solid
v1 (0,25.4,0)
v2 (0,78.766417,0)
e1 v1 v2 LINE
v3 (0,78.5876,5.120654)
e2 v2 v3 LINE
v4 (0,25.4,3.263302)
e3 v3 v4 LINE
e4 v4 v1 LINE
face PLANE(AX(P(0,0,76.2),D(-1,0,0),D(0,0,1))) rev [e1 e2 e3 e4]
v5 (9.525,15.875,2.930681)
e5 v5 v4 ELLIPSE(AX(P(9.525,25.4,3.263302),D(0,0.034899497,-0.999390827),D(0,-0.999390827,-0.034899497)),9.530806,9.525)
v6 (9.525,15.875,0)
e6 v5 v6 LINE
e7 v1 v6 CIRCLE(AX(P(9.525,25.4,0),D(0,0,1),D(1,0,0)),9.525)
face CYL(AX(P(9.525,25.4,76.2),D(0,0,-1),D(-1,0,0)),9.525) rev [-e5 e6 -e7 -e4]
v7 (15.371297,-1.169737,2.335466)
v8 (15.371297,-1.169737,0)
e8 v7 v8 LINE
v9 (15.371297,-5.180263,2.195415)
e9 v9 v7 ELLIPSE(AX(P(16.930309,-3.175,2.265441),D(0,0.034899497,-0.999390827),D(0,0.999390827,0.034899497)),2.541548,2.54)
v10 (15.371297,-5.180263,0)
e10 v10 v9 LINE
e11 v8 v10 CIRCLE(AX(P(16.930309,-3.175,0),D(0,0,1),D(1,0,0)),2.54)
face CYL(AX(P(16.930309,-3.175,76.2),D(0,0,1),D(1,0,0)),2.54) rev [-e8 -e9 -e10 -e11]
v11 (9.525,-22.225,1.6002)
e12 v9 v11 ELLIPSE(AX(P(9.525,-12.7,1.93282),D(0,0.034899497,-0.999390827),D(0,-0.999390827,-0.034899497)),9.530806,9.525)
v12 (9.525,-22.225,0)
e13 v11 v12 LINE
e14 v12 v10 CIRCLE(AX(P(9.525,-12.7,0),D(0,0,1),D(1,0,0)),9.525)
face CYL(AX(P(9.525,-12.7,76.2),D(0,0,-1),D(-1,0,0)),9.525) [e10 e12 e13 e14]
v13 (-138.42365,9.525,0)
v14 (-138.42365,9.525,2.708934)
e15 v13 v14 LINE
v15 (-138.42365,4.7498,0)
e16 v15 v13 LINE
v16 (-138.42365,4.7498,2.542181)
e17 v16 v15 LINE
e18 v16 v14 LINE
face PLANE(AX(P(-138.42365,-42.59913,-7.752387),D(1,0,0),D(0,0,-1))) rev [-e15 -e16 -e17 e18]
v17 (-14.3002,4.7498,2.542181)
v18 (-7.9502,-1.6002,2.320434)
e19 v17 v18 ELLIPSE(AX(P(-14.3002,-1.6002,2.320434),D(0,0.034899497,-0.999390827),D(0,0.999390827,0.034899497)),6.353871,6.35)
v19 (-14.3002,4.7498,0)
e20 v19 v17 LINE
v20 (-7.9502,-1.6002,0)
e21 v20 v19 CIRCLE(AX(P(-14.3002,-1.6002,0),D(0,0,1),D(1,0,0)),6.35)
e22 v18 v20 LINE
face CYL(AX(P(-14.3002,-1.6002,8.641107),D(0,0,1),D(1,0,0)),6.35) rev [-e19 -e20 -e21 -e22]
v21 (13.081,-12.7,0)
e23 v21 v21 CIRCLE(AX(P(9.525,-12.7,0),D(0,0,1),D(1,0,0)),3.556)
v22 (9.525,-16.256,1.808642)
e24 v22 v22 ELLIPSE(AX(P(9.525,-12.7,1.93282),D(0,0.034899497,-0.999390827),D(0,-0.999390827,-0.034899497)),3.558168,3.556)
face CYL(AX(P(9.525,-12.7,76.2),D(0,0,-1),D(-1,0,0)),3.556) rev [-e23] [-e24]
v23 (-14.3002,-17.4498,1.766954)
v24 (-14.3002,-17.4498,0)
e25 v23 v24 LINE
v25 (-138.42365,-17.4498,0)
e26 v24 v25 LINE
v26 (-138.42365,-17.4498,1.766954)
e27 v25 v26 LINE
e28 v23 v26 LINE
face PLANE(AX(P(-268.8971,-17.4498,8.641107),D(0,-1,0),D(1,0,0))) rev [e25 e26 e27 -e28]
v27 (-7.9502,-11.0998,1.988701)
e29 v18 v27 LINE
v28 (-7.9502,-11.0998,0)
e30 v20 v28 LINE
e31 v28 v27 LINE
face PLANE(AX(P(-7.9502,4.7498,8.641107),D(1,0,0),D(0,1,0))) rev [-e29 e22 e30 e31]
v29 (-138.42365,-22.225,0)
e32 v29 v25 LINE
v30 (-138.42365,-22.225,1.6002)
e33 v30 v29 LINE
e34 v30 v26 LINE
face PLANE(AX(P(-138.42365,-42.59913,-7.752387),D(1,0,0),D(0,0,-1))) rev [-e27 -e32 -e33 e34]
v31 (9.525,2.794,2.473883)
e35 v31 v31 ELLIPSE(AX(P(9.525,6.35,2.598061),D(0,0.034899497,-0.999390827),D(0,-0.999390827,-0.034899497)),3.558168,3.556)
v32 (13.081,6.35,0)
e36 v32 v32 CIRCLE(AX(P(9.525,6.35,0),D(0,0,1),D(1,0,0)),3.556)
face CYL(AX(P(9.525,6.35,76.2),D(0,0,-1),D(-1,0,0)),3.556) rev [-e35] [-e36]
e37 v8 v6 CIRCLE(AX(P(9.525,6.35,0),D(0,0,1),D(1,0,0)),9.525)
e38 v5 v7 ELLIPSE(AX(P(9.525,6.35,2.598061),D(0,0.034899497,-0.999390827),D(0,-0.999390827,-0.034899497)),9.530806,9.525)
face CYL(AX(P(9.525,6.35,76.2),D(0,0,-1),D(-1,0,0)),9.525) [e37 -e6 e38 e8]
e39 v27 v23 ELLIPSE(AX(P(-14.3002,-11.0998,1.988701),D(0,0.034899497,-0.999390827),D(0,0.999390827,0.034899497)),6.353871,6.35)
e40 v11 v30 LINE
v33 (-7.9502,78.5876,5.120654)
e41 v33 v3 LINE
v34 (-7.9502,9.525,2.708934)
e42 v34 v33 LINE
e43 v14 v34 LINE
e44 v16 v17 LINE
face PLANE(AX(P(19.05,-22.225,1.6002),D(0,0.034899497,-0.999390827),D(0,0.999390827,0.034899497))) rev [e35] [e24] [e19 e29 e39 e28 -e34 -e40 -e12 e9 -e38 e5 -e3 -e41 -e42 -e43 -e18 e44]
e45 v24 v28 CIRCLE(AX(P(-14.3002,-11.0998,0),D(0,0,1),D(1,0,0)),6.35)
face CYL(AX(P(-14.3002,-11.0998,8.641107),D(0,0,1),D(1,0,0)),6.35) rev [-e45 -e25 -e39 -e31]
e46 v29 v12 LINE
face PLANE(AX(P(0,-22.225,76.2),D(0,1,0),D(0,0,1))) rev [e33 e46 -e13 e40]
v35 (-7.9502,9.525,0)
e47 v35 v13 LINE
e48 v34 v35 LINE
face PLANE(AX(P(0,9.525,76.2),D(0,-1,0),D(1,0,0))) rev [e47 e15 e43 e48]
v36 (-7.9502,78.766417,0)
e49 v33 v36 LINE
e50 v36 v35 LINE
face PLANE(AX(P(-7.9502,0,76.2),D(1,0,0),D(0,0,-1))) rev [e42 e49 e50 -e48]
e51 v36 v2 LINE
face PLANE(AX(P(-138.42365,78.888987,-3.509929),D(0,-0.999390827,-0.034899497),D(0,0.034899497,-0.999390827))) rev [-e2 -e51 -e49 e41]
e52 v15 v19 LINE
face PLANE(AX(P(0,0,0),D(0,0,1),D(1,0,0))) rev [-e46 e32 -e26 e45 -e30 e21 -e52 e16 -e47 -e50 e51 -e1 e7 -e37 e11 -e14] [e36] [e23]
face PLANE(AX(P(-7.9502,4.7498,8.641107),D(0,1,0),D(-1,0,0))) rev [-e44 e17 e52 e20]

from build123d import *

# Parameters (mm, degrees)
BOSS_EXTRUDE1_OUTLINE_R = 3.556
BOSS_EXTRUDE1_OUTLINE_W = 260.9469
BOSS_EXTRUDE1_OUTLINE_H = 138.1252
BOSS_EXTRUDE1_DEPTH     = 76.2
CUT_EXTRUDE1_DEPTH      = 355.32482824
CUT_EXTRUDE1_DEPTH_BACK = 355.32482824
FILLET1_R               = 2.54
SKETCH7_W               = 260.9469
SKETCH7_H               = 22.1996
CUT_EXTRUDE2_DEPTH      = 347.152897849
FILLET2_R               = 6.35
SKETCH8_W               = 190.775627824
SKETCH8_H               = 235.521960295
CUT_EXTRUDE4_DEPTH      = 347.144751077
SKETCH9_W               = 166.035784577
SKETCH9_H               = 113.418104201
CUT_EXTRUDE5_DEPTH      = 227.747805823


# Read off the part's stored shape, not the designer's step: Boss-Extrude1
with BuildPart() as part:
    # Boss-Extrude1 outline → Boss-Extrude1 (new body)
    with BuildSketch(Plane.XY):
        with BuildLine():
            Line((-286.3596, -22.225), (9.525, -22.225))
            ThreePointArc((9.525, -22.225), (19.05, -12.7), (9.525, -3.175))
            ThreePointArc((9.525, -3.175), (19.05, 6.35), (9.525, 15.875))
            ThreePointArc((9.525, 15.875), (2.789807909, 18.664807909), (0, 25.4))
            Line((0, 25.4), (0, 131.7752))
            ThreePointArc((0, 131.7752), (2.789807909, 138.510392091), (9.525, 141.3002))
            ThreePointArc((9.525, 141.3002), (19.05, 150.8252), (9.525, 160.3502))
            ThreePointArc((9.525, 160.3502), (19.05, 169.8752), (9.525, 179.4002))
            Line((9.525, 179.4002), (-6.35, 179.4002))
            Line((-6.35, 179.4002), (-6.35, 163.5252))
            Line((-6.35, 163.5252), (-7.9502, 163.5252))
            Line((-7.9502, 163.5252), (-7.9502, 160.3502))
            Line((-7.9502, 160.3502), (-268.9098, 160.3502))
            Line((-268.9098, 160.3502), (-268.9098, 163.5252))
            Line((-268.9098, 163.5252), (-270.51, 163.5252))
            Line((-270.51, 163.5252), (-270.51, 179.4002))
            Line((-270.51, 179.4002), (-286.385, 179.4002))
            ThreePointArc((-286.385, 179.4002), (-295.91, 169.8752), (-286.385, 160.3502))
            ThreePointArc((-286.385, 160.3502), (-295.897297883, 150.818850004), (-286.3723, 141.3002))
            ThreePointArc((-286.3723, 141.3002), (-279.637107909, 138.510392091), (-276.8473, 131.7752))
            Line((-276.8473, 131.7752), (-276.8473, 25.4))
            ThreePointArc((-276.8473, 25.4), (-279.637107909, 18.664807909), (-286.3723, 15.875))
            ThreePointArc((-286.3723, 15.875), (-295.8973, 6.35), (-286.3723, -3.175))
            ThreePointArc((-286.3723, -3.175), (-295.884597883, -12.706349996), (-286.3596, -22.225))
        make_face()
        with Locations((-286.3596, -12.7)):
            Circle(BOSS_EXTRUDE1_OUTLINE_R, mode=Mode.SUBTRACT)
        with Locations((-286.3723, 6.35)):
            Circle(BOSS_EXTRUDE1_OUTLINE_R, mode=Mode.SUBTRACT)
        with Locations((9.525, -12.7)):
            Circle(BOSS_EXTRUDE1_OUTLINE_R, mode=Mode.SUBTRACT)
        with Locations((9.525, 6.35)):
            Circle(BOSS_EXTRUDE1_OUTLINE_R, mode=Mode.SUBTRACT)
        with Locations((-286.3723, 150.8252)):
            Circle(BOSS_EXTRUDE1_OUTLINE_R, mode=Mode.SUBTRACT)
        with Locations((-286.385, 169.8752)):
            Circle(BOSS_EXTRUDE1_OUTLINE_R, mode=Mode.SUBTRACT)
        with Locations((-138.42365, 78.5876)):
            Rectangle(BOSS_EXTRUDE1_OUTLINE_W, BOSS_EXTRUDE1_OUTLINE_H, mode=Mode.SUBTRACT)
        with Locations((9.525, 150.8252)):
            Circle(BOSS_EXTRUDE1_OUTLINE_R, mode=Mode.SUBTRACT)
        with Locations((9.525, 169.8752)):
            Circle(BOSS_EXTRUDE1_OUTLINE_R, mode=Mode.SUBTRACT)
    extrude(amount=BOSS_EXTRUDE1_DEPTH)

    # Sketch5 → Cut-Extrude1 (cut, two sides: drawn at the far end of the back side and taken through both)
    with BuildSketch(Plane.ZY.offset(276.8473).offset(-CUT_EXTRUDE1_DEPTH_BACK)):
        Polygon((1.6002, -22.225), (8.641107133, 179.4002), (76.2, 179.4002), (76.2, -22.225), align=None)
    extrude(amount=CUT_EXTRUDE1_DEPTH + CUT_EXTRUDE1_DEPTH_BACK, mode=Mode.SUBTRACT)

    # Fillet1
    fillet1_edges = [part.edges().sort_by_distance(p)[0] for p in [
        (-286.385, 160.3502, 3.987933237),
        (-286.3723, -3.175, 1.132720329),
        (9.525, -3.175, 1.132720329),
        (9.525, 160.3502, 3.987933237),
    ]]
    fillet(fillet1_edges, radius=FILLET1_R)

    # Sketch7 → Cut-Extrude2 (cut, through all)
    with BuildSketch(Plane(origin=(0, 0, 0), x_dir=(-1, 0, 0), z_dir=(0, 0, -1))):
        with Locations((138.42365, -6.35)):
            Rectangle(SKETCH7_W, SKETCH7_H)
    extrude(amount=-CUT_EXTRUDE2_DEPTH, mode=Mode.SUBTRACT)

    # Fillet2
    fillet2_edges = [part.edges().sort_by_distance(p)[0] for p in [
        (-268.8971, 4.7498, 1.271090386),
        (-268.8971, -17.4498, 0.883476829),
        (-7.9502, -17.4498, 0.883476829),
        (-7.9502, 4.7498, 1.271090386),
    ]]
    fillet(fillet2_edges, radius=FILLET2_R)

    # Sketch8 → Cut-Extrude4 (cut, through all)
    with BuildSketch(Plane(origin=(0, -0.082881646, 2.373419811), x_dir=(1, 0, 0), z_dir=(0, -0.03489949670250444, 0.9993908270190958))):
        with Locations((-233.811463912, 74.917246318)):
            Rectangle(SKETCH8_W, SKETCH8_H)
    extrude(amount=-CUT_EXTRUDE4_DEPTH, mode=Mode.SUBTRACT)

    # Sketch9 → Cut-Extrude5 (cut, through all)
    with BuildSketch(Plane(origin=(0, -0.082881646, 2.373419811), x_dir=(1, 0, 0), z_dir=(0, -0.03489949670250444, 0.9993908270190958))):
        with Locations((-55.405757712, 135.427486891)):
            Rectangle(SKETCH9_W, SKETCH9_H)
    extrude(amount=-CUT_EXTRUDE5_DEPTH, mode=Mode.SUBTRACT)


solid = part.part
